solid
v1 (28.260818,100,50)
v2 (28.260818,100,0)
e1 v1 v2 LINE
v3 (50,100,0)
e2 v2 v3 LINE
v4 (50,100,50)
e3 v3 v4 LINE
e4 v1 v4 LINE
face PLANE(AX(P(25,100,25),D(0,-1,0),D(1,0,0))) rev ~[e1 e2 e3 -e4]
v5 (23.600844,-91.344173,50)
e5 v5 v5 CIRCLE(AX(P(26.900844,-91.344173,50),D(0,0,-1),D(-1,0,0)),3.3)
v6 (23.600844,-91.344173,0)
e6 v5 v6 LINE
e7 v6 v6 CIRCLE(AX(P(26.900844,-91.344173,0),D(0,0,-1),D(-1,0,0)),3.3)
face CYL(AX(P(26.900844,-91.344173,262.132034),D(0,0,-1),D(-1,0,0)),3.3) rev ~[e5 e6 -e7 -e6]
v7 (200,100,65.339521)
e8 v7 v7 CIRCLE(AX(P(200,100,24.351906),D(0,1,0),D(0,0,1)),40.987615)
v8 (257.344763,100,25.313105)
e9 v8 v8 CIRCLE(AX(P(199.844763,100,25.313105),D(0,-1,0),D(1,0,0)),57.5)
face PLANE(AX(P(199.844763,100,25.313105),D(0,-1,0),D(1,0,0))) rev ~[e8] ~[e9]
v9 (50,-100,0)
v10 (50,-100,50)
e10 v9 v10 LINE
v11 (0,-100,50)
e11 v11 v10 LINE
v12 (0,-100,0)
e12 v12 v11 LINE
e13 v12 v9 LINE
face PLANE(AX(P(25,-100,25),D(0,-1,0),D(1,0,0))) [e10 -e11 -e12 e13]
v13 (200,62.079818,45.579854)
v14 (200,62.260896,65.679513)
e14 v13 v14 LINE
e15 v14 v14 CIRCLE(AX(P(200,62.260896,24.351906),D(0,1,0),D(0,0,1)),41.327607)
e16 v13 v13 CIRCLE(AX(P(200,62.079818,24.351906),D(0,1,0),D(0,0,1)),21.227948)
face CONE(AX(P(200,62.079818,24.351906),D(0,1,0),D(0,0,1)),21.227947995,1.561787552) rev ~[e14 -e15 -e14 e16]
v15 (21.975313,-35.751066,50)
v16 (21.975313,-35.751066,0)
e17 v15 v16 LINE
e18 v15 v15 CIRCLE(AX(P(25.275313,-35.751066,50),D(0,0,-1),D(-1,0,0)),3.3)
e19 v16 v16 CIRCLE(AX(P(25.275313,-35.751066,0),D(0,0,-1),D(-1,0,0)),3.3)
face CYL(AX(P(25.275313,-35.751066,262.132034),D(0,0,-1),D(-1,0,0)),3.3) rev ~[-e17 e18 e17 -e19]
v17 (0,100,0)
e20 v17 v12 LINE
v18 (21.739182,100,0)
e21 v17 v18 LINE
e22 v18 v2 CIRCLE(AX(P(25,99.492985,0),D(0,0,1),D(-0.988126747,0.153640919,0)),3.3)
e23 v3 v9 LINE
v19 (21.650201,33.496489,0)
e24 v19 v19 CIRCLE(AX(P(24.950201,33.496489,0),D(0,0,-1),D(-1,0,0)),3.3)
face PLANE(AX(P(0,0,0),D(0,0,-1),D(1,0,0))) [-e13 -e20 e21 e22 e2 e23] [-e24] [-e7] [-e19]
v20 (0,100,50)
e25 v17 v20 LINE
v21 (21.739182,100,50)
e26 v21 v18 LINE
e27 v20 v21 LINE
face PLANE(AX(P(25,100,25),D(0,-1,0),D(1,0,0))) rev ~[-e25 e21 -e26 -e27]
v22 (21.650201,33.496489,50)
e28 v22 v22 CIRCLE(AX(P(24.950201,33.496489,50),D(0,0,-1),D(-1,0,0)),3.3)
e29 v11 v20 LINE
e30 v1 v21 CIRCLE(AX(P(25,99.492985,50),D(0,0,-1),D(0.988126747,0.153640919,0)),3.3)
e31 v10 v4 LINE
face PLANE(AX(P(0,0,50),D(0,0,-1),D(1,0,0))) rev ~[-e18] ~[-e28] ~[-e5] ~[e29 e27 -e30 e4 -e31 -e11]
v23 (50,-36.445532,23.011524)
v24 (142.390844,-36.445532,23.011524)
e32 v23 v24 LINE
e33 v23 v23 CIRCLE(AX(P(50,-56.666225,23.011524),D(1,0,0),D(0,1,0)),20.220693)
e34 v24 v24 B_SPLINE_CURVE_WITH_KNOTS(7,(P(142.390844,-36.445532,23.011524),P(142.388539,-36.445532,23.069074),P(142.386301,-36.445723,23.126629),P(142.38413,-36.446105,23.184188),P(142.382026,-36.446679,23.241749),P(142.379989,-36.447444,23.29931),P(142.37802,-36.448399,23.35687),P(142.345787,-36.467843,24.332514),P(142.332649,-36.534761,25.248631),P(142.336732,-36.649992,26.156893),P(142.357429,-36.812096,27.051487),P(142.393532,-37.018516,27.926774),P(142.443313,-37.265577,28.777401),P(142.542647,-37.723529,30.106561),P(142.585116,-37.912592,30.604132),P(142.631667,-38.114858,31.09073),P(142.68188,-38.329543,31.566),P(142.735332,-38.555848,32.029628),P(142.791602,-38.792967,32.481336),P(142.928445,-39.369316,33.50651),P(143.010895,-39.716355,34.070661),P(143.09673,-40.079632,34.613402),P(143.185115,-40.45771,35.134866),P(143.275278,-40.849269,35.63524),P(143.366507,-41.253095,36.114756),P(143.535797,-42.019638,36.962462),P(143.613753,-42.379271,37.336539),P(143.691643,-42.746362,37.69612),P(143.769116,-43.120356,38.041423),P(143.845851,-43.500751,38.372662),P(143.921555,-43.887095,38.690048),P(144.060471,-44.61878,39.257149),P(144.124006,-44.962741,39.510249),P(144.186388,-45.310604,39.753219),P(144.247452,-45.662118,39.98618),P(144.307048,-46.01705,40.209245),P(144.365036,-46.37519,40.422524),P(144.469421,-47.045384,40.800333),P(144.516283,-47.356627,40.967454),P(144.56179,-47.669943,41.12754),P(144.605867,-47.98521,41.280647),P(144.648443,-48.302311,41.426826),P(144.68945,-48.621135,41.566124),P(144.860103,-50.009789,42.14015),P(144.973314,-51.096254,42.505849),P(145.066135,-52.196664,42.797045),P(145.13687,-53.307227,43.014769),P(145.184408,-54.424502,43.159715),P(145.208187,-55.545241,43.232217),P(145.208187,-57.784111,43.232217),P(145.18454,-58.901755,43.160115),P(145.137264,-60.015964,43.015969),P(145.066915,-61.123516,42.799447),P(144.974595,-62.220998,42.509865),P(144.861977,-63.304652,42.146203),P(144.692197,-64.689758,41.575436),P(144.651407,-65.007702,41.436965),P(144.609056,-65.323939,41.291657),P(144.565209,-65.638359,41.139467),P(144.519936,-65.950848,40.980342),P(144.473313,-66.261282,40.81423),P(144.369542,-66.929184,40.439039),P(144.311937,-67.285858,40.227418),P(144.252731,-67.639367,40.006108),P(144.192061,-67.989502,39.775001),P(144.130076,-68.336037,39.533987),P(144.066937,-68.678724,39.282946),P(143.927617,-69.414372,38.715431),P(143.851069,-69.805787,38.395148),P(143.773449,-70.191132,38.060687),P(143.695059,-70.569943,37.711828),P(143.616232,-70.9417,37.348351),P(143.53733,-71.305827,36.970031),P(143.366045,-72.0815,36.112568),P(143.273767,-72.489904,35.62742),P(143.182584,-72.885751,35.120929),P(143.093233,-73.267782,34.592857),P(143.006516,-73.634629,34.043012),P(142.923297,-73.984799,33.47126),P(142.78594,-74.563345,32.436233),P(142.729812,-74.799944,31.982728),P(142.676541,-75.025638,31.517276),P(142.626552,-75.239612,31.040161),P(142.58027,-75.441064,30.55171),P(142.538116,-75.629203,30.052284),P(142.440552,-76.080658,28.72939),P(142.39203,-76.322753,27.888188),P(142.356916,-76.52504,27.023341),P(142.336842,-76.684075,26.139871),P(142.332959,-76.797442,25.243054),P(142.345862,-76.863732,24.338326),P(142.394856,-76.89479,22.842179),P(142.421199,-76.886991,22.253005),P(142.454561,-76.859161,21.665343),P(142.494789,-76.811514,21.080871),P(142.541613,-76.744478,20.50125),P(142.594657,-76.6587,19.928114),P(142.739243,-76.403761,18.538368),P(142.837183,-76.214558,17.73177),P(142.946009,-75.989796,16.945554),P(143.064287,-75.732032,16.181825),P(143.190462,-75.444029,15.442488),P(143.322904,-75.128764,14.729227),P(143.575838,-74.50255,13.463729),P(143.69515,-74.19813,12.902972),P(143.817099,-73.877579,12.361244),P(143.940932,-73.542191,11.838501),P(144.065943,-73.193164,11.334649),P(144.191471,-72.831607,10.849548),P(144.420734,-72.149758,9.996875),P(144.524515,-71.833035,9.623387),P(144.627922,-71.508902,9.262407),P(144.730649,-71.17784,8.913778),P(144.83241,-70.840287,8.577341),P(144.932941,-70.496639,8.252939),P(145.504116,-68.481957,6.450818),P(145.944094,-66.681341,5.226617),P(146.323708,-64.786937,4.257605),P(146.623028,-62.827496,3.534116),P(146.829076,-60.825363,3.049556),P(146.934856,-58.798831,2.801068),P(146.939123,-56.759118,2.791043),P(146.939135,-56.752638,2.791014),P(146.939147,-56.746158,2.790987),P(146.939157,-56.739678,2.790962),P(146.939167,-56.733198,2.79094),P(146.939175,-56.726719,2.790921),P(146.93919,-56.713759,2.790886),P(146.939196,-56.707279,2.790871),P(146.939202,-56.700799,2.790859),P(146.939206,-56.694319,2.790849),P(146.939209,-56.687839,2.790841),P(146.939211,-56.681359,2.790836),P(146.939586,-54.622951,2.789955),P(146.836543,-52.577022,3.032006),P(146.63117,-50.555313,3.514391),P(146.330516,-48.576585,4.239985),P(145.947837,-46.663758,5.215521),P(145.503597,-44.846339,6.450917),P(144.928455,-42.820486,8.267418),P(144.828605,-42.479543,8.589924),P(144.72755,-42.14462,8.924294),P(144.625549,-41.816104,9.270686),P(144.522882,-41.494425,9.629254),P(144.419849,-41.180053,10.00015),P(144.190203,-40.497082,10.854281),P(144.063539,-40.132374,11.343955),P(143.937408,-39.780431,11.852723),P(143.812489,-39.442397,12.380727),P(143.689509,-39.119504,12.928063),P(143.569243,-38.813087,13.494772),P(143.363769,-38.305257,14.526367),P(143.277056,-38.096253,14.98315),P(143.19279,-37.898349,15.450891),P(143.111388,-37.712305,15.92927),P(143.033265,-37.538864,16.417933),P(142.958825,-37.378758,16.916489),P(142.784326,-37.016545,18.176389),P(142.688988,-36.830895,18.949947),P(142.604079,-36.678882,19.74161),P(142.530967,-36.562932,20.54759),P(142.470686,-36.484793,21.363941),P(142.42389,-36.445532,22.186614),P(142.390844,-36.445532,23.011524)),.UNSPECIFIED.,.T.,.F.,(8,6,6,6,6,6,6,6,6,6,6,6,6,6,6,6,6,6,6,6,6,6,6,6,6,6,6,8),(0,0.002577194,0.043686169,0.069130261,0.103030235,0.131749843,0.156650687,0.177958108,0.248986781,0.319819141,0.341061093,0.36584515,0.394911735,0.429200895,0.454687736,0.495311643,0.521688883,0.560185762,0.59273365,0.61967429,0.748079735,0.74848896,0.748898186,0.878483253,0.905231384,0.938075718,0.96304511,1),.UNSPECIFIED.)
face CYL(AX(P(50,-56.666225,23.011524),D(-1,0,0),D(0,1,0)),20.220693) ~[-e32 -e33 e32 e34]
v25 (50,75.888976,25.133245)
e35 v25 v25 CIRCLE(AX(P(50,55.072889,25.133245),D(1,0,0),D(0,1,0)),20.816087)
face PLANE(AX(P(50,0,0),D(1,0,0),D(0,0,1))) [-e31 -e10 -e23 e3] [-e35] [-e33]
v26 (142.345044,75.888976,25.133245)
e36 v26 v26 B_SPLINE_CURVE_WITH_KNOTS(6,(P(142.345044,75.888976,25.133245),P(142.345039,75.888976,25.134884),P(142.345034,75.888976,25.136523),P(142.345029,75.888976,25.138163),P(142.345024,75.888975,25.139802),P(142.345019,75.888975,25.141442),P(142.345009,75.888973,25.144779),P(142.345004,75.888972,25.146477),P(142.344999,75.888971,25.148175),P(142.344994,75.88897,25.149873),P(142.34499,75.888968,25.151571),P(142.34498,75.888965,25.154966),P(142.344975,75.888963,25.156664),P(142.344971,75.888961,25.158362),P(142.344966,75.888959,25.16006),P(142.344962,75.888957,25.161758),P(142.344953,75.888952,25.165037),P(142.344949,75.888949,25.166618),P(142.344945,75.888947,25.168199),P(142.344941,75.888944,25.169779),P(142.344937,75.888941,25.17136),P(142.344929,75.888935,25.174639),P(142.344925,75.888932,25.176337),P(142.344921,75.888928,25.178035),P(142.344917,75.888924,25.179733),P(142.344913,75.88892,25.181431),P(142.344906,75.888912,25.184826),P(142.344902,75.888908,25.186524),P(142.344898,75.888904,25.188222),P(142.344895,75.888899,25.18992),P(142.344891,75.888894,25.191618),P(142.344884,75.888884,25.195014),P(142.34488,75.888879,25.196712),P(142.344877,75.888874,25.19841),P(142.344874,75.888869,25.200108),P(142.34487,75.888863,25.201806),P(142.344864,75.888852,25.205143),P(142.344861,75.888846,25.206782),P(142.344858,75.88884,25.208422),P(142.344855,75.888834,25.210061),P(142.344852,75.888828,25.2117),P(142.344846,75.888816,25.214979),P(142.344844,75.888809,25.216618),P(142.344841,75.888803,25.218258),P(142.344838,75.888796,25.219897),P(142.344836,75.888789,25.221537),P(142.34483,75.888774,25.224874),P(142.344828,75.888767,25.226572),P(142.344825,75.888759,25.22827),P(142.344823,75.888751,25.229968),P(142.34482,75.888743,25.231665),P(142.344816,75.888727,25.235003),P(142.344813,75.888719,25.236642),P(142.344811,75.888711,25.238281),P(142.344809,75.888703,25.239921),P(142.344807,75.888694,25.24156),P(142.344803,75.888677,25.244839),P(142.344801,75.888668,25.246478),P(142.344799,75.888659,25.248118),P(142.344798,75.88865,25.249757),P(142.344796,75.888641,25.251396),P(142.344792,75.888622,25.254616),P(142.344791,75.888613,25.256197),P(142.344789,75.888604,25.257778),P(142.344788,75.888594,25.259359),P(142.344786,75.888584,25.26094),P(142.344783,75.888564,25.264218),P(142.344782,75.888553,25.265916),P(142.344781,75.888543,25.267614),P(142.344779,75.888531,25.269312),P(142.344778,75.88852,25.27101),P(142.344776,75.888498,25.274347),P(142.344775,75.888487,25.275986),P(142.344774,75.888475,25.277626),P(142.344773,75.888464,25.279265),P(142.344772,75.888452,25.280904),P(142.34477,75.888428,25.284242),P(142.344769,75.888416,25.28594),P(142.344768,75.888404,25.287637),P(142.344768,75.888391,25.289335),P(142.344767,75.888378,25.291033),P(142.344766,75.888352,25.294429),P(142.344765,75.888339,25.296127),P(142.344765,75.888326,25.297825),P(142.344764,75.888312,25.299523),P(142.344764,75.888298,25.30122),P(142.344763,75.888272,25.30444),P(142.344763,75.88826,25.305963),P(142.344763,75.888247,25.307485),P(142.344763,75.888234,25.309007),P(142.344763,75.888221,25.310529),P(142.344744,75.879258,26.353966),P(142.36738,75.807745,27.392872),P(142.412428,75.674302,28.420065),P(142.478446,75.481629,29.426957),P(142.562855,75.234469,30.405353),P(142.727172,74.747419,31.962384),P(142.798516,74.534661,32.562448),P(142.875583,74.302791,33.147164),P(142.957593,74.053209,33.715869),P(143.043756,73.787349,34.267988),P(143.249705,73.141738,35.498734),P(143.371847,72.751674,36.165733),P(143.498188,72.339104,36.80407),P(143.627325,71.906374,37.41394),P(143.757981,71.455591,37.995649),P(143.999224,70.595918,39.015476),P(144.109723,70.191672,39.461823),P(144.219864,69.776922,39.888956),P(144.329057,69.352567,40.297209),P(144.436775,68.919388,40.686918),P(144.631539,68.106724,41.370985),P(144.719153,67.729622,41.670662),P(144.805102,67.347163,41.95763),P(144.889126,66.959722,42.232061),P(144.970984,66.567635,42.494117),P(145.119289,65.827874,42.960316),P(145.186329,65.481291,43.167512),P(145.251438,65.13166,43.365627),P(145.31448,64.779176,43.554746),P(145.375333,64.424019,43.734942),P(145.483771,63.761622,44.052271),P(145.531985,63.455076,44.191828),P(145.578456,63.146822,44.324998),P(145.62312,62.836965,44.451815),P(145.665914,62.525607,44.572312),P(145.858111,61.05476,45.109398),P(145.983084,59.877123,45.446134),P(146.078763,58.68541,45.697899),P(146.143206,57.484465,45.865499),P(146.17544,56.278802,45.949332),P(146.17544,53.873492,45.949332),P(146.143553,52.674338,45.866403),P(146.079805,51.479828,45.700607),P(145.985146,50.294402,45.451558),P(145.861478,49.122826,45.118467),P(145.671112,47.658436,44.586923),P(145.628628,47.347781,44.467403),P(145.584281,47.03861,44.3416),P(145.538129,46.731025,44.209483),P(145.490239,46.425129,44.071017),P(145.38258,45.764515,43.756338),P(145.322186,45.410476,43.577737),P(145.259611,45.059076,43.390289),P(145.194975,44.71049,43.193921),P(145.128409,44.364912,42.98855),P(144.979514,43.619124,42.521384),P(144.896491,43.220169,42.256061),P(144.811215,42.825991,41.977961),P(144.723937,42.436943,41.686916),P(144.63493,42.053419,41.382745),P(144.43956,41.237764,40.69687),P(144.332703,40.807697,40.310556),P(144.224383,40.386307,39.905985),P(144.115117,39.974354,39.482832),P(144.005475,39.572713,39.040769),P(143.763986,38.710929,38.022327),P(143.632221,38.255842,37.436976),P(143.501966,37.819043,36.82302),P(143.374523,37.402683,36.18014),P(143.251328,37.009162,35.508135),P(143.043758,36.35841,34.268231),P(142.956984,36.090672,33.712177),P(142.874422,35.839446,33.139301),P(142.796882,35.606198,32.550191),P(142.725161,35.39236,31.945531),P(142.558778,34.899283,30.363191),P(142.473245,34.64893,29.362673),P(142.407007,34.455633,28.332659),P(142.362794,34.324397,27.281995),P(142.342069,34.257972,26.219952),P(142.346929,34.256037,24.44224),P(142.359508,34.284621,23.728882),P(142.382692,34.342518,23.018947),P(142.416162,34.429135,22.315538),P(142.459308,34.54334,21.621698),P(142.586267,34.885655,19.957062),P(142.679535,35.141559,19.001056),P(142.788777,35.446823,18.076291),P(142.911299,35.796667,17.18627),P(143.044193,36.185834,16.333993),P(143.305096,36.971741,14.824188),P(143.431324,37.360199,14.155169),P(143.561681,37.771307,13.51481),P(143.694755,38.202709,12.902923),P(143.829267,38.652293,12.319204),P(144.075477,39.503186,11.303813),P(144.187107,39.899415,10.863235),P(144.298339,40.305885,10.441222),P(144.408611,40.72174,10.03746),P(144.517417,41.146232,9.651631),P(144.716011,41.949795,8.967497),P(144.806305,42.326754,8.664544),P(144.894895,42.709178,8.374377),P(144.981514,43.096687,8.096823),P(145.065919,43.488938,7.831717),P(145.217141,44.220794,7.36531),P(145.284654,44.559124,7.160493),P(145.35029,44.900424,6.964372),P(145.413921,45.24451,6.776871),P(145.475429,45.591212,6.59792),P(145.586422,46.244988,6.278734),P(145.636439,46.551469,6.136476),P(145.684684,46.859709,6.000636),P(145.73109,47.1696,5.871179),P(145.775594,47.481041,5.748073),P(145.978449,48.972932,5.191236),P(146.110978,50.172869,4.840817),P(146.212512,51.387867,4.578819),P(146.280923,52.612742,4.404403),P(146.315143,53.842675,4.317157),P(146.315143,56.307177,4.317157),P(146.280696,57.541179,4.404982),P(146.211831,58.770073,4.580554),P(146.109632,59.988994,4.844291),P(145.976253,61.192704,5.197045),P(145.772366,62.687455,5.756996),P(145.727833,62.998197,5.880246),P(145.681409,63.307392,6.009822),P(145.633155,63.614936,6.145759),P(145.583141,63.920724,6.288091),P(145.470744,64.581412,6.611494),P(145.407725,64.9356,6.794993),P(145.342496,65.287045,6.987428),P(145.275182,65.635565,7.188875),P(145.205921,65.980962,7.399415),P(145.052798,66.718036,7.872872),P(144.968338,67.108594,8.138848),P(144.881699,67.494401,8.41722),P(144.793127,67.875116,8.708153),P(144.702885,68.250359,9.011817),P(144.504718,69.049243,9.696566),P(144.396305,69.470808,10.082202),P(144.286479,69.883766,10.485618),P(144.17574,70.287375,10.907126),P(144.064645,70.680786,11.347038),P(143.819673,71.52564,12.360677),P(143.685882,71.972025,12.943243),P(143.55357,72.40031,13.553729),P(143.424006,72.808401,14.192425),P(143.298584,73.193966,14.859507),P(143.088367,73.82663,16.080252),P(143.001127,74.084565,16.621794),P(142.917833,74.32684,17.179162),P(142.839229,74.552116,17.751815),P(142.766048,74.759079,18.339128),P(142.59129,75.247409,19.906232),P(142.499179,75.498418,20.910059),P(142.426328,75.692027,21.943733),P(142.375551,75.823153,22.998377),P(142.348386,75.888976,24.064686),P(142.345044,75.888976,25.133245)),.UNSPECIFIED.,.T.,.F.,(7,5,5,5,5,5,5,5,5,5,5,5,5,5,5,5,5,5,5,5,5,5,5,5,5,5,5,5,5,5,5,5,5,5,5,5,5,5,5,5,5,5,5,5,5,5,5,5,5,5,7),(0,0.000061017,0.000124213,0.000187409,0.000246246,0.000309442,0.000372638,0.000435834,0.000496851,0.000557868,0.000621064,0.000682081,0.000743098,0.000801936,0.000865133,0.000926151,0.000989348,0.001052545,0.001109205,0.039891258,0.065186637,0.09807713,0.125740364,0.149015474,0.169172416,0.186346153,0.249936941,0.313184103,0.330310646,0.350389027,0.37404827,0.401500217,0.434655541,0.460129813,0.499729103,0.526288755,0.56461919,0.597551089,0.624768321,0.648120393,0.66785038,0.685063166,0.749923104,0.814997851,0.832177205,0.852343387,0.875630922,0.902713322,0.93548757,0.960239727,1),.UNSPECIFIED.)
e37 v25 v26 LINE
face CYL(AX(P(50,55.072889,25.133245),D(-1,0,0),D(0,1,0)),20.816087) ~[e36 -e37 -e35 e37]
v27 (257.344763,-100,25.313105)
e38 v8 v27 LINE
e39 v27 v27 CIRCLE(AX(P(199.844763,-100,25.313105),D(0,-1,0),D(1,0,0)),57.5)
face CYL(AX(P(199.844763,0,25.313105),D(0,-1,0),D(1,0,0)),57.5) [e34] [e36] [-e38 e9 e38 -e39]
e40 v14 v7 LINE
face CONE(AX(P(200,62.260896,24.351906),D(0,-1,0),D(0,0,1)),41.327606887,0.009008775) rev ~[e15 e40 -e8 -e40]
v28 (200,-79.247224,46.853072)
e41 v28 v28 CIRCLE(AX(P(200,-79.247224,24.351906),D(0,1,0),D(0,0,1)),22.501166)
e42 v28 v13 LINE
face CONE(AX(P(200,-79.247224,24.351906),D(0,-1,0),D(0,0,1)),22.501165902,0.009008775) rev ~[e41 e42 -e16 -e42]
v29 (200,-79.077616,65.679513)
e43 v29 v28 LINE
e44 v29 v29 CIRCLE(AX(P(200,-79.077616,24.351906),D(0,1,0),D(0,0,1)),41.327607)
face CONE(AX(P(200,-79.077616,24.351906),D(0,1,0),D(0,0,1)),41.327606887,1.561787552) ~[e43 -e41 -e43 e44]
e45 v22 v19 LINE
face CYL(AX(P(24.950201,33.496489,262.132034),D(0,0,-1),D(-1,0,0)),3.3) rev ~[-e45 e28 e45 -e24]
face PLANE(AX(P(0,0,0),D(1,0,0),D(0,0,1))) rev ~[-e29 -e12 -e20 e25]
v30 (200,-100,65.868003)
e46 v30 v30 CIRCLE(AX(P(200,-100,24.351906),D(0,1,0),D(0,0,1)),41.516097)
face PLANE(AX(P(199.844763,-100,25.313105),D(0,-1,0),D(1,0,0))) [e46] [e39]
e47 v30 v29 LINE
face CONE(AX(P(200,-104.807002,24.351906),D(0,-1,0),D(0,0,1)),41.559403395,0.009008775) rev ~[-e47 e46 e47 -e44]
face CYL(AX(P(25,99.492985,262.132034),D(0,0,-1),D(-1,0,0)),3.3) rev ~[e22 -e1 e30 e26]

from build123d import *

# Parameters (mm, degrees)
F0_W     = 50
F0_H     = 50
F1_DEPTH = 100
F3_D     = 6.6
F4_R     = 20.2206931271
F4_R_2   = 20.8160873388
F5_DEPTH = 150
F6_R     = 57.5
F7_DEPTH = 100


with BuildPart() as f1:
    # F0 (on Front) → F1 (new body, symmetric)
    with BuildSketch(Plane.XZ):
        with Locations((25, 25)):
            Rectangle(F0_W, F0_H)
    extrude(amount=F1_DEPTH, both=True)

    # F3 (through all)
    with Locations(Plane.XY.offset(50)):
        with Locations((25, 99.4929849688), (24.9502013015, 33.496488903), (25.2753126699, -35.7510662615), (26.9008440388, -91.3441732113)):
            Hole(F3_D / 2)

    # F4 (on face) → F5 (join)
    with BuildSketch(Plane.YZ.offset(50)):
        with Locations((-56.6662251949, 23.0115242302)):
            Circle(F4_R)
        with Locations((55.072888732, 25.1332446933)):
            Circle(F4_R_2)
    extrude(amount=F5_DEPTH)

    # F6 (on Front) → F7 (join, symmetric)
    with BuildSketch(Plane.XZ):
        with Locations((199.8447626829, 25.3131054342)):
            Circle(F6_R)
    extrude(amount=F7_DEPTH, both=True)

    # F9 (on offset) → F10 (revolve, cut)
    with BuildSketch(Plane(origin=(200, 0, 0), x_dir=(0, -1, 0), z_dir=(-1, 0, 0))):
        Polygon((-105.5897921324, 24.3519060314), (100.8795276284, 24.3519060314), (101.4911159873, 24.6927142143), (105.1713102595, 25.4731605558), (104.8070022361, 65.9113094268), (79.0776162995, 65.679512918), (79.2472240509, 46.8530719335), (-62.0798177726, 45.5798540268), (-62.2608959675, 65.679512918), (-105.5897921324, 65.2891620994), align=None)
    revolve(axis=Axis((200, 2.355132252, 24.3519060314), (0, 1, 0)), mode=Mode.SUBTRACT)


solid = f1.part
